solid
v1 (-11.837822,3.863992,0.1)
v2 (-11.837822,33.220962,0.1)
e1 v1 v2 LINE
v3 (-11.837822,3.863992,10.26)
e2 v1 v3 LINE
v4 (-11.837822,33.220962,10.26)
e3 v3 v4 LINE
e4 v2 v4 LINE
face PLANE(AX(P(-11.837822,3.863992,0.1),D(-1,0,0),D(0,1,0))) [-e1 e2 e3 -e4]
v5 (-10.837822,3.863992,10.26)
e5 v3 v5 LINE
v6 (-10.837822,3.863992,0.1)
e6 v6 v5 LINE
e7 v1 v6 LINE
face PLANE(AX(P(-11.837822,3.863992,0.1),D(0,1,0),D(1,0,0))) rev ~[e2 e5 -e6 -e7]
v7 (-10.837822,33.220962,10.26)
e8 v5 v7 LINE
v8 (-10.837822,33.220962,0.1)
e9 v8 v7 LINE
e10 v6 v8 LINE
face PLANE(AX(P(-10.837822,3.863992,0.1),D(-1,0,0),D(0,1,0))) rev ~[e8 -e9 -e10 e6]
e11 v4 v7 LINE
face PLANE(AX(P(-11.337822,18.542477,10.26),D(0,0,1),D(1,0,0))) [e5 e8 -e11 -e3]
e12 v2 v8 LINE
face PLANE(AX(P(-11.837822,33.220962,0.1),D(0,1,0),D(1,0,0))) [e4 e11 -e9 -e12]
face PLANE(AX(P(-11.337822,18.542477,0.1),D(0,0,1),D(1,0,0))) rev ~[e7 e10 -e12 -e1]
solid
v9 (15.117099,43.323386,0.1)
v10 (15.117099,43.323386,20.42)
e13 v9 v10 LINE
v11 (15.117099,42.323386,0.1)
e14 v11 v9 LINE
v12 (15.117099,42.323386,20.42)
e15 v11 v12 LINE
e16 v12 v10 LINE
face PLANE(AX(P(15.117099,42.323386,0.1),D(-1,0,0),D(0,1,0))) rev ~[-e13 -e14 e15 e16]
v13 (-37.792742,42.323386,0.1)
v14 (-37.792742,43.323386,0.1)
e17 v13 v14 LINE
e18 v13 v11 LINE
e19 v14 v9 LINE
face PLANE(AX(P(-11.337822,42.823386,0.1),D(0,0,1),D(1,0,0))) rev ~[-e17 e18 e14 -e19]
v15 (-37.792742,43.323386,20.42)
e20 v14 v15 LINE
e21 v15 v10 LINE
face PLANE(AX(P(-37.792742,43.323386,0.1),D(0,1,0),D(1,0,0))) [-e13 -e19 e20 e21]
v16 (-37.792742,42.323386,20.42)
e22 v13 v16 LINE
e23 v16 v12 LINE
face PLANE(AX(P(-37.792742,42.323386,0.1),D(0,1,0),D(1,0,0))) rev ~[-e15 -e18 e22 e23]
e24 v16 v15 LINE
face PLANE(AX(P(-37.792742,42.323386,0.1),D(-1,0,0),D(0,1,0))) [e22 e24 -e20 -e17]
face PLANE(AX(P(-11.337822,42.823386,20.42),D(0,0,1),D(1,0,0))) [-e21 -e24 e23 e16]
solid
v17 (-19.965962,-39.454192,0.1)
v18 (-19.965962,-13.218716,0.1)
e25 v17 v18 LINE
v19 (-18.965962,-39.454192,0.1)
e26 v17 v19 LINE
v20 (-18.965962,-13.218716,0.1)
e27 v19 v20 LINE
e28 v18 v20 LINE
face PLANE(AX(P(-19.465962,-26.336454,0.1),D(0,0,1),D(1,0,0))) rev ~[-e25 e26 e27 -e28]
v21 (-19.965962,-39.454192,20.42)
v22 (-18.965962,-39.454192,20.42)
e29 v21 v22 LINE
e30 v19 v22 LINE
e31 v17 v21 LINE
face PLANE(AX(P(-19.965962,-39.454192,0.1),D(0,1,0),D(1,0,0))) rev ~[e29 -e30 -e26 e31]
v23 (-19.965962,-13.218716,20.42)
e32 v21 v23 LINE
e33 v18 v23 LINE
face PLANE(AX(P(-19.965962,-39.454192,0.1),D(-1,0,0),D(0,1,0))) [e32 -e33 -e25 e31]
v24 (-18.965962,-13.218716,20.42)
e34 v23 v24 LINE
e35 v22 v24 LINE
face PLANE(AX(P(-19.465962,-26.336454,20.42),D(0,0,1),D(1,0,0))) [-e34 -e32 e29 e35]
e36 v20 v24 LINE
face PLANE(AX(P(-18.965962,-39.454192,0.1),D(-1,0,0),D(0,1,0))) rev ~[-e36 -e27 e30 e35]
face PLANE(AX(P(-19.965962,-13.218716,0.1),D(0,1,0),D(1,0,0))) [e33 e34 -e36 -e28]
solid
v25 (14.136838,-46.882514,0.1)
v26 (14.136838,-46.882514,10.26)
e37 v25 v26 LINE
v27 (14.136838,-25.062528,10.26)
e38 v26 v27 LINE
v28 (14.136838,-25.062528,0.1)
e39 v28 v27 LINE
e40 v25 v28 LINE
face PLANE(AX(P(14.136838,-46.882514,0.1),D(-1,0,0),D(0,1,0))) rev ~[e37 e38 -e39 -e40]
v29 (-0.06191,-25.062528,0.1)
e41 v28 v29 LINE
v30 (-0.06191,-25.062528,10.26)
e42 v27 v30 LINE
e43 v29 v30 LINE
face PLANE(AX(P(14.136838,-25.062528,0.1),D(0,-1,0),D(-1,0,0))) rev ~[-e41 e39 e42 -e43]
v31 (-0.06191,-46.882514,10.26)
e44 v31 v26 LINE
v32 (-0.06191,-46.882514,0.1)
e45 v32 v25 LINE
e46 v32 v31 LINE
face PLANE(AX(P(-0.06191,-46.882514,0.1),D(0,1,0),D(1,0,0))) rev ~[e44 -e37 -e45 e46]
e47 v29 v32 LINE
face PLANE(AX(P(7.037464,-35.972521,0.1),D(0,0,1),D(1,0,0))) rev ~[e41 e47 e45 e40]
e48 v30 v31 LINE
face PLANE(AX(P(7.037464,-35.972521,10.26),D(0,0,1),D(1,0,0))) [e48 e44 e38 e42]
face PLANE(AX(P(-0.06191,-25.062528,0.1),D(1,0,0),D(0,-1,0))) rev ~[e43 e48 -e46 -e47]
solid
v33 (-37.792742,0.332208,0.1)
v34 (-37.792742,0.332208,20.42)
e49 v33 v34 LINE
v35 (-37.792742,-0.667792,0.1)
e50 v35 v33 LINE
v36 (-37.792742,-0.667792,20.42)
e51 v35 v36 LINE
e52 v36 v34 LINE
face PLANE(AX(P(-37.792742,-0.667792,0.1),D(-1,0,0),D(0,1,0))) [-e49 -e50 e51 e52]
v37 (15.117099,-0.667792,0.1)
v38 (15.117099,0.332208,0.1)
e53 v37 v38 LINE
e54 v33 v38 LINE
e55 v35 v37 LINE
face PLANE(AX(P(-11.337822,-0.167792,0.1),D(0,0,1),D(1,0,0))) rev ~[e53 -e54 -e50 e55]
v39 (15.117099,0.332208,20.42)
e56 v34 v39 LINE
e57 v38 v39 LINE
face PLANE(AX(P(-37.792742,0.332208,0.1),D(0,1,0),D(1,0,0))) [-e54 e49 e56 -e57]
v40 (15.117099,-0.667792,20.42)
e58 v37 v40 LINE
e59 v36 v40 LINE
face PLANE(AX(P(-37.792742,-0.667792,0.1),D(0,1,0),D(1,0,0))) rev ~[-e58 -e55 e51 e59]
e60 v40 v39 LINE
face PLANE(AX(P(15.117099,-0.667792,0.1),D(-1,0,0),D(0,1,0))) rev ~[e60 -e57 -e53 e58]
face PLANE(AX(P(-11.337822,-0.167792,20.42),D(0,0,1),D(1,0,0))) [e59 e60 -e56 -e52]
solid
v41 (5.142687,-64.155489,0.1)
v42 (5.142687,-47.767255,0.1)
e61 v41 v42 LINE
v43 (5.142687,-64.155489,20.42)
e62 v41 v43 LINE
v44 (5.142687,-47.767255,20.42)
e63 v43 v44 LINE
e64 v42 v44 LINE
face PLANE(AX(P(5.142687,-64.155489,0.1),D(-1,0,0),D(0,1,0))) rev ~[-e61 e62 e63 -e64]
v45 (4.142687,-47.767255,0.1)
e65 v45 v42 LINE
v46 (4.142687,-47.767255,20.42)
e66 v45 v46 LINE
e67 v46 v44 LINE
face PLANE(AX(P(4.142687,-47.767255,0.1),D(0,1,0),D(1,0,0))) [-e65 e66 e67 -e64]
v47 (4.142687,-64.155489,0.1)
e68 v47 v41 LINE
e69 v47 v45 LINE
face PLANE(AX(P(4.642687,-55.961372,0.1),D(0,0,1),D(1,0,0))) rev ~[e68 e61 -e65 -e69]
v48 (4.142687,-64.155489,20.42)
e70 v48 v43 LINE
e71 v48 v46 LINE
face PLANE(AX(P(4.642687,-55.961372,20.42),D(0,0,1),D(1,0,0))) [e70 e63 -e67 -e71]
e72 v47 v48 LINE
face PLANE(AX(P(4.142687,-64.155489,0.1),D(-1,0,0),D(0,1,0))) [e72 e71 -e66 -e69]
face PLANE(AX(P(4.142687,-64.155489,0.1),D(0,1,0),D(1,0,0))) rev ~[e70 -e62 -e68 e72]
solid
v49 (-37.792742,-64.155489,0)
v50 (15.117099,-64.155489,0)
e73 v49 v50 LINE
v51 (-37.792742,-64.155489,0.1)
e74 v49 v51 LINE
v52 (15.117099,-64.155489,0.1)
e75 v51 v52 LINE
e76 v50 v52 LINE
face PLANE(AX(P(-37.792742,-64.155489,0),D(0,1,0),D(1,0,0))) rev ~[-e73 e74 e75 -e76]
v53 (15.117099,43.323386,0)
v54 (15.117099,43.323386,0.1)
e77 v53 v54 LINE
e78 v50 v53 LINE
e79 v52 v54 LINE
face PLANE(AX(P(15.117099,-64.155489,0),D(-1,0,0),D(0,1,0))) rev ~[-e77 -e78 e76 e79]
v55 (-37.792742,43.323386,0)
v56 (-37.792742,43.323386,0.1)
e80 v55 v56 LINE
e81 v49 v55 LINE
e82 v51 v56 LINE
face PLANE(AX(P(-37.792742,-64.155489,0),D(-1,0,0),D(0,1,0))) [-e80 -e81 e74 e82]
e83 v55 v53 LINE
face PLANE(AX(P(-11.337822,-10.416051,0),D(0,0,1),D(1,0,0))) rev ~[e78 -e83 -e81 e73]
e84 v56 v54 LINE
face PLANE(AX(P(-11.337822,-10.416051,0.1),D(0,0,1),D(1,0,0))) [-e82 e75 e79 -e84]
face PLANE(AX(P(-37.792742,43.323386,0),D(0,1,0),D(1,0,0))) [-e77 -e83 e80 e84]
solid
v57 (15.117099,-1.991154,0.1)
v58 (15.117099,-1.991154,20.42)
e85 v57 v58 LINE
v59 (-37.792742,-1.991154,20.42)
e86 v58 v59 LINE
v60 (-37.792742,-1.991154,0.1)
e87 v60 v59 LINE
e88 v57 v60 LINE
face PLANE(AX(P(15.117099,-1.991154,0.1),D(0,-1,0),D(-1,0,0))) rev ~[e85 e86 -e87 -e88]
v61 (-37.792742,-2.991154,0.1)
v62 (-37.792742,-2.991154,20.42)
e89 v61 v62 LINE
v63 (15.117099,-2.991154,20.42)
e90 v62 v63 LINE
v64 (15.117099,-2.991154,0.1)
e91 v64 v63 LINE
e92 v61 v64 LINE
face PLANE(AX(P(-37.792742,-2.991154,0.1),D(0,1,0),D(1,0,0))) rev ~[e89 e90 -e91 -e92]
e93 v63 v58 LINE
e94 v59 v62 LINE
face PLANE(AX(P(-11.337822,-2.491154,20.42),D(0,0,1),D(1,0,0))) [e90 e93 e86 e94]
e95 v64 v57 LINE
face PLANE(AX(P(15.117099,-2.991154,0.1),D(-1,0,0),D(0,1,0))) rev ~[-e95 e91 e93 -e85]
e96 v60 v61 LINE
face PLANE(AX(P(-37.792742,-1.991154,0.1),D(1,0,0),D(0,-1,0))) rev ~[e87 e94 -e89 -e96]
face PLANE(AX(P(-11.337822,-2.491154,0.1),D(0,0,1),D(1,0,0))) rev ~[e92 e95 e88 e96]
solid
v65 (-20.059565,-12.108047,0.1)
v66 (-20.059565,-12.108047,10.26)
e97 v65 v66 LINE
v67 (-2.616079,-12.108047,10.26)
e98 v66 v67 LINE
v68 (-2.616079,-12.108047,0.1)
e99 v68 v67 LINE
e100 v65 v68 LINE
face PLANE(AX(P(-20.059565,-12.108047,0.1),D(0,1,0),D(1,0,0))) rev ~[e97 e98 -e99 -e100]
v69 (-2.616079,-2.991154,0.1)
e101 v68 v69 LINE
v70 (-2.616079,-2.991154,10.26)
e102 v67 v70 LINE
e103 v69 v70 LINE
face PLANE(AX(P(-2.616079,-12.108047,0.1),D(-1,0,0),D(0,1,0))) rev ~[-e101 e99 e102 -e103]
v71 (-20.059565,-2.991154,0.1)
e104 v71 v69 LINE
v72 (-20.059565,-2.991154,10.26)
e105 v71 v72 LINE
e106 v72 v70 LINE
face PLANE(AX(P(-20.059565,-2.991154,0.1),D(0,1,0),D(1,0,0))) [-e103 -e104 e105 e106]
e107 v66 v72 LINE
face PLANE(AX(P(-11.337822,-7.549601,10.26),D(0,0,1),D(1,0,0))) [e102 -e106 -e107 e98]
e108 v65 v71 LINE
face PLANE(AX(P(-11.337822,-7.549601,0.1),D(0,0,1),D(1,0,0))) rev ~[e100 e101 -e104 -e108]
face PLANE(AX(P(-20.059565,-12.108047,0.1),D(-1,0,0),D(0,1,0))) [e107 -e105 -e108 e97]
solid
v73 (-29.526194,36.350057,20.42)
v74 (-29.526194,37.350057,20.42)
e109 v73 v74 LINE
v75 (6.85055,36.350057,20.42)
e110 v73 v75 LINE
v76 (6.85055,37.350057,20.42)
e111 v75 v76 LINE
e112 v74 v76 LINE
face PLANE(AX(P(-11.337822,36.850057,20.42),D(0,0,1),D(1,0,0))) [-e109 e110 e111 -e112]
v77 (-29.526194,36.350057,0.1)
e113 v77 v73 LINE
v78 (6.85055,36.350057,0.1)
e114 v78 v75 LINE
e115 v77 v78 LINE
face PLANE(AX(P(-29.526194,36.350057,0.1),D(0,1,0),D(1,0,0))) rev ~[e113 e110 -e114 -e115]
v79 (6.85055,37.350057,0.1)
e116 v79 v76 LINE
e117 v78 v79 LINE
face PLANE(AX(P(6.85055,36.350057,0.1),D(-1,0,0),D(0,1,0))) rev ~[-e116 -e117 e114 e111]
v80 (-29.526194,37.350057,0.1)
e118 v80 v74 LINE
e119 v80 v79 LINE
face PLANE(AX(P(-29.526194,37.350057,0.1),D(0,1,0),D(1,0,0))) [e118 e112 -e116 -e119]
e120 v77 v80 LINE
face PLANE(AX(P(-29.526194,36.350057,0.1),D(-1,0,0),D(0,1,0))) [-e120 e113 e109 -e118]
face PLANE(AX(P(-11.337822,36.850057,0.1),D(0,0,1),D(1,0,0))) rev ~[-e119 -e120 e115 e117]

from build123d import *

# Parameters (mm, degrees)
F0_W     = 52.9098408297
F0_H     = 107.4788756669
F1_DEPTH = 0.1
F2_W     = 52.9098408297
F2_H     = 1
F3_DEPTH = 20.32
F2_W_2   = 36.3767435774
F2_W_3   = 1
F2_H_2   = 26.2354757977
F2_H_3   = 16.3882337511
F2_H_4   = 29.3569701103
F4_DEPTH = 10.16
F2_W_4   = 17.4434864894
F2_H_5   = 9.1168937506


# Not quite as in the source:
# - a feature names something its author has since deleted; it is built from what else it names
# - the program builds the solid bodies; features that only make, move or delete a surface that nothing else refers to are left out


with BuildPart() as f1:
    # F0 (on Top) → F1 (new body)
    with BuildSketch(Plane.XY):
        with Locations((-11.3378218375, -10.4160513729)):
            Rectangle(F0_W, F0_H)
    extrude(amount=F1_DEPTH)


with BuildPart() as f3:
    # F2 (on face) → F3 (new body)
    with BuildSketch(Plane.XY.offset(0.1)):
        with Locations((-11.3378218375, 42.8233864605)):
            Rectangle(F2_W, F2_H)
    extrude(amount=F3_DEPTH)


with BuildPart() as f3b:
    # F2 (on face) → F3, piece 2 (new body)
    with BuildSketch(Plane.XY.offset(0.1)):
        with Locations((-11.3378218375, 36.850056529)):
            Rectangle(F2_W_2, F2_H)
    extrude(amount=F3_DEPTH)


with BuildPart() as f3c:
    # F2 (on face) → F3, piece 3 (new body)
    with BuildSketch(Plane.XY.offset(0.1)):
        Polygon((15.1170985773, -1.9911537422), (-37.7927422523, -1.9911537422), (-37.7927422523, -2.9911537422), (-20.0595650822, -2.9911537422), (-2.6160785928, -2.9911537422), (15.1170985773, -2.9911537422), align=None)
    extrude(amount=F3_DEPTH)


with BuildPart() as f3d:
    # F2 (on face) → F3, piece 4 (new body)
    with BuildSketch(Plane.XY.offset(0.1)):
        with Locations((-19.4659615755, -26.3364540243)):
            Rectangle(F2_W_3, F2_H_2)
    extrude(amount=F3_DEPTH)


with BuildPart() as f3e:
    # F2 (on face) → F3, piece 5 (new body)
    with BuildSketch(Plane.XY.offset(0.1)):
        with Locations((4.6426873542, -55.9613723308)):
            Rectangle(F2_W_3, F2_H_3)
    extrude(amount=F3_DEPTH)


with BuildPart() as f3f:
    # F2 (on face) → F3, piece 6 (new body)
    with BuildSketch(Plane.XY.offset(0.1)):
        with Locations((-11.3378218375, -0.1677915226)):
            Rectangle(F2_W, F2_H)
    extrude(amount=F3_DEPTH)


with BuildPart() as f4:
    # F2 (on face) → F4 (new body)
    with BuildSketch(Plane.XY.offset(0.1)):
        with Locations((-11.3378218375, 18.5424766348)):
            Rectangle(F2_W_3, F2_H_4)
    extrude(amount=F4_DEPTH)


with BuildPart() as f4b:
    # F2 (on face) → F4, piece 2 (new body)
    with BuildSketch(Plane.XY.offset(0.1)):
        with Locations((-11.3378218375, -7.5496006175)):
            Rectangle(F2_W_4, F2_H_5)
    extrude(amount=F4_DEPTH)


with BuildPart() as f4c:
    # F2 (on face) → F4, piece 3 (new body)
    with BuildSketch(Plane.XY.offset(0.1)):
        Polygon((14.1368384046, -25.0625275075), (2.9698581193, -25.0625275075), (-0.0619098573, -25.0625275075), (-0.0619098573, -46.8825139105), (14.1368384046, -46.8825139105), align=None)
    extrude(amount=F4_DEPTH)


solid = Compound([f1.part, f3.part, f3b.part, f3c.part, f3d.part, f3e.part, f3f.part, f4.part, f4b.part, f4c.part])
